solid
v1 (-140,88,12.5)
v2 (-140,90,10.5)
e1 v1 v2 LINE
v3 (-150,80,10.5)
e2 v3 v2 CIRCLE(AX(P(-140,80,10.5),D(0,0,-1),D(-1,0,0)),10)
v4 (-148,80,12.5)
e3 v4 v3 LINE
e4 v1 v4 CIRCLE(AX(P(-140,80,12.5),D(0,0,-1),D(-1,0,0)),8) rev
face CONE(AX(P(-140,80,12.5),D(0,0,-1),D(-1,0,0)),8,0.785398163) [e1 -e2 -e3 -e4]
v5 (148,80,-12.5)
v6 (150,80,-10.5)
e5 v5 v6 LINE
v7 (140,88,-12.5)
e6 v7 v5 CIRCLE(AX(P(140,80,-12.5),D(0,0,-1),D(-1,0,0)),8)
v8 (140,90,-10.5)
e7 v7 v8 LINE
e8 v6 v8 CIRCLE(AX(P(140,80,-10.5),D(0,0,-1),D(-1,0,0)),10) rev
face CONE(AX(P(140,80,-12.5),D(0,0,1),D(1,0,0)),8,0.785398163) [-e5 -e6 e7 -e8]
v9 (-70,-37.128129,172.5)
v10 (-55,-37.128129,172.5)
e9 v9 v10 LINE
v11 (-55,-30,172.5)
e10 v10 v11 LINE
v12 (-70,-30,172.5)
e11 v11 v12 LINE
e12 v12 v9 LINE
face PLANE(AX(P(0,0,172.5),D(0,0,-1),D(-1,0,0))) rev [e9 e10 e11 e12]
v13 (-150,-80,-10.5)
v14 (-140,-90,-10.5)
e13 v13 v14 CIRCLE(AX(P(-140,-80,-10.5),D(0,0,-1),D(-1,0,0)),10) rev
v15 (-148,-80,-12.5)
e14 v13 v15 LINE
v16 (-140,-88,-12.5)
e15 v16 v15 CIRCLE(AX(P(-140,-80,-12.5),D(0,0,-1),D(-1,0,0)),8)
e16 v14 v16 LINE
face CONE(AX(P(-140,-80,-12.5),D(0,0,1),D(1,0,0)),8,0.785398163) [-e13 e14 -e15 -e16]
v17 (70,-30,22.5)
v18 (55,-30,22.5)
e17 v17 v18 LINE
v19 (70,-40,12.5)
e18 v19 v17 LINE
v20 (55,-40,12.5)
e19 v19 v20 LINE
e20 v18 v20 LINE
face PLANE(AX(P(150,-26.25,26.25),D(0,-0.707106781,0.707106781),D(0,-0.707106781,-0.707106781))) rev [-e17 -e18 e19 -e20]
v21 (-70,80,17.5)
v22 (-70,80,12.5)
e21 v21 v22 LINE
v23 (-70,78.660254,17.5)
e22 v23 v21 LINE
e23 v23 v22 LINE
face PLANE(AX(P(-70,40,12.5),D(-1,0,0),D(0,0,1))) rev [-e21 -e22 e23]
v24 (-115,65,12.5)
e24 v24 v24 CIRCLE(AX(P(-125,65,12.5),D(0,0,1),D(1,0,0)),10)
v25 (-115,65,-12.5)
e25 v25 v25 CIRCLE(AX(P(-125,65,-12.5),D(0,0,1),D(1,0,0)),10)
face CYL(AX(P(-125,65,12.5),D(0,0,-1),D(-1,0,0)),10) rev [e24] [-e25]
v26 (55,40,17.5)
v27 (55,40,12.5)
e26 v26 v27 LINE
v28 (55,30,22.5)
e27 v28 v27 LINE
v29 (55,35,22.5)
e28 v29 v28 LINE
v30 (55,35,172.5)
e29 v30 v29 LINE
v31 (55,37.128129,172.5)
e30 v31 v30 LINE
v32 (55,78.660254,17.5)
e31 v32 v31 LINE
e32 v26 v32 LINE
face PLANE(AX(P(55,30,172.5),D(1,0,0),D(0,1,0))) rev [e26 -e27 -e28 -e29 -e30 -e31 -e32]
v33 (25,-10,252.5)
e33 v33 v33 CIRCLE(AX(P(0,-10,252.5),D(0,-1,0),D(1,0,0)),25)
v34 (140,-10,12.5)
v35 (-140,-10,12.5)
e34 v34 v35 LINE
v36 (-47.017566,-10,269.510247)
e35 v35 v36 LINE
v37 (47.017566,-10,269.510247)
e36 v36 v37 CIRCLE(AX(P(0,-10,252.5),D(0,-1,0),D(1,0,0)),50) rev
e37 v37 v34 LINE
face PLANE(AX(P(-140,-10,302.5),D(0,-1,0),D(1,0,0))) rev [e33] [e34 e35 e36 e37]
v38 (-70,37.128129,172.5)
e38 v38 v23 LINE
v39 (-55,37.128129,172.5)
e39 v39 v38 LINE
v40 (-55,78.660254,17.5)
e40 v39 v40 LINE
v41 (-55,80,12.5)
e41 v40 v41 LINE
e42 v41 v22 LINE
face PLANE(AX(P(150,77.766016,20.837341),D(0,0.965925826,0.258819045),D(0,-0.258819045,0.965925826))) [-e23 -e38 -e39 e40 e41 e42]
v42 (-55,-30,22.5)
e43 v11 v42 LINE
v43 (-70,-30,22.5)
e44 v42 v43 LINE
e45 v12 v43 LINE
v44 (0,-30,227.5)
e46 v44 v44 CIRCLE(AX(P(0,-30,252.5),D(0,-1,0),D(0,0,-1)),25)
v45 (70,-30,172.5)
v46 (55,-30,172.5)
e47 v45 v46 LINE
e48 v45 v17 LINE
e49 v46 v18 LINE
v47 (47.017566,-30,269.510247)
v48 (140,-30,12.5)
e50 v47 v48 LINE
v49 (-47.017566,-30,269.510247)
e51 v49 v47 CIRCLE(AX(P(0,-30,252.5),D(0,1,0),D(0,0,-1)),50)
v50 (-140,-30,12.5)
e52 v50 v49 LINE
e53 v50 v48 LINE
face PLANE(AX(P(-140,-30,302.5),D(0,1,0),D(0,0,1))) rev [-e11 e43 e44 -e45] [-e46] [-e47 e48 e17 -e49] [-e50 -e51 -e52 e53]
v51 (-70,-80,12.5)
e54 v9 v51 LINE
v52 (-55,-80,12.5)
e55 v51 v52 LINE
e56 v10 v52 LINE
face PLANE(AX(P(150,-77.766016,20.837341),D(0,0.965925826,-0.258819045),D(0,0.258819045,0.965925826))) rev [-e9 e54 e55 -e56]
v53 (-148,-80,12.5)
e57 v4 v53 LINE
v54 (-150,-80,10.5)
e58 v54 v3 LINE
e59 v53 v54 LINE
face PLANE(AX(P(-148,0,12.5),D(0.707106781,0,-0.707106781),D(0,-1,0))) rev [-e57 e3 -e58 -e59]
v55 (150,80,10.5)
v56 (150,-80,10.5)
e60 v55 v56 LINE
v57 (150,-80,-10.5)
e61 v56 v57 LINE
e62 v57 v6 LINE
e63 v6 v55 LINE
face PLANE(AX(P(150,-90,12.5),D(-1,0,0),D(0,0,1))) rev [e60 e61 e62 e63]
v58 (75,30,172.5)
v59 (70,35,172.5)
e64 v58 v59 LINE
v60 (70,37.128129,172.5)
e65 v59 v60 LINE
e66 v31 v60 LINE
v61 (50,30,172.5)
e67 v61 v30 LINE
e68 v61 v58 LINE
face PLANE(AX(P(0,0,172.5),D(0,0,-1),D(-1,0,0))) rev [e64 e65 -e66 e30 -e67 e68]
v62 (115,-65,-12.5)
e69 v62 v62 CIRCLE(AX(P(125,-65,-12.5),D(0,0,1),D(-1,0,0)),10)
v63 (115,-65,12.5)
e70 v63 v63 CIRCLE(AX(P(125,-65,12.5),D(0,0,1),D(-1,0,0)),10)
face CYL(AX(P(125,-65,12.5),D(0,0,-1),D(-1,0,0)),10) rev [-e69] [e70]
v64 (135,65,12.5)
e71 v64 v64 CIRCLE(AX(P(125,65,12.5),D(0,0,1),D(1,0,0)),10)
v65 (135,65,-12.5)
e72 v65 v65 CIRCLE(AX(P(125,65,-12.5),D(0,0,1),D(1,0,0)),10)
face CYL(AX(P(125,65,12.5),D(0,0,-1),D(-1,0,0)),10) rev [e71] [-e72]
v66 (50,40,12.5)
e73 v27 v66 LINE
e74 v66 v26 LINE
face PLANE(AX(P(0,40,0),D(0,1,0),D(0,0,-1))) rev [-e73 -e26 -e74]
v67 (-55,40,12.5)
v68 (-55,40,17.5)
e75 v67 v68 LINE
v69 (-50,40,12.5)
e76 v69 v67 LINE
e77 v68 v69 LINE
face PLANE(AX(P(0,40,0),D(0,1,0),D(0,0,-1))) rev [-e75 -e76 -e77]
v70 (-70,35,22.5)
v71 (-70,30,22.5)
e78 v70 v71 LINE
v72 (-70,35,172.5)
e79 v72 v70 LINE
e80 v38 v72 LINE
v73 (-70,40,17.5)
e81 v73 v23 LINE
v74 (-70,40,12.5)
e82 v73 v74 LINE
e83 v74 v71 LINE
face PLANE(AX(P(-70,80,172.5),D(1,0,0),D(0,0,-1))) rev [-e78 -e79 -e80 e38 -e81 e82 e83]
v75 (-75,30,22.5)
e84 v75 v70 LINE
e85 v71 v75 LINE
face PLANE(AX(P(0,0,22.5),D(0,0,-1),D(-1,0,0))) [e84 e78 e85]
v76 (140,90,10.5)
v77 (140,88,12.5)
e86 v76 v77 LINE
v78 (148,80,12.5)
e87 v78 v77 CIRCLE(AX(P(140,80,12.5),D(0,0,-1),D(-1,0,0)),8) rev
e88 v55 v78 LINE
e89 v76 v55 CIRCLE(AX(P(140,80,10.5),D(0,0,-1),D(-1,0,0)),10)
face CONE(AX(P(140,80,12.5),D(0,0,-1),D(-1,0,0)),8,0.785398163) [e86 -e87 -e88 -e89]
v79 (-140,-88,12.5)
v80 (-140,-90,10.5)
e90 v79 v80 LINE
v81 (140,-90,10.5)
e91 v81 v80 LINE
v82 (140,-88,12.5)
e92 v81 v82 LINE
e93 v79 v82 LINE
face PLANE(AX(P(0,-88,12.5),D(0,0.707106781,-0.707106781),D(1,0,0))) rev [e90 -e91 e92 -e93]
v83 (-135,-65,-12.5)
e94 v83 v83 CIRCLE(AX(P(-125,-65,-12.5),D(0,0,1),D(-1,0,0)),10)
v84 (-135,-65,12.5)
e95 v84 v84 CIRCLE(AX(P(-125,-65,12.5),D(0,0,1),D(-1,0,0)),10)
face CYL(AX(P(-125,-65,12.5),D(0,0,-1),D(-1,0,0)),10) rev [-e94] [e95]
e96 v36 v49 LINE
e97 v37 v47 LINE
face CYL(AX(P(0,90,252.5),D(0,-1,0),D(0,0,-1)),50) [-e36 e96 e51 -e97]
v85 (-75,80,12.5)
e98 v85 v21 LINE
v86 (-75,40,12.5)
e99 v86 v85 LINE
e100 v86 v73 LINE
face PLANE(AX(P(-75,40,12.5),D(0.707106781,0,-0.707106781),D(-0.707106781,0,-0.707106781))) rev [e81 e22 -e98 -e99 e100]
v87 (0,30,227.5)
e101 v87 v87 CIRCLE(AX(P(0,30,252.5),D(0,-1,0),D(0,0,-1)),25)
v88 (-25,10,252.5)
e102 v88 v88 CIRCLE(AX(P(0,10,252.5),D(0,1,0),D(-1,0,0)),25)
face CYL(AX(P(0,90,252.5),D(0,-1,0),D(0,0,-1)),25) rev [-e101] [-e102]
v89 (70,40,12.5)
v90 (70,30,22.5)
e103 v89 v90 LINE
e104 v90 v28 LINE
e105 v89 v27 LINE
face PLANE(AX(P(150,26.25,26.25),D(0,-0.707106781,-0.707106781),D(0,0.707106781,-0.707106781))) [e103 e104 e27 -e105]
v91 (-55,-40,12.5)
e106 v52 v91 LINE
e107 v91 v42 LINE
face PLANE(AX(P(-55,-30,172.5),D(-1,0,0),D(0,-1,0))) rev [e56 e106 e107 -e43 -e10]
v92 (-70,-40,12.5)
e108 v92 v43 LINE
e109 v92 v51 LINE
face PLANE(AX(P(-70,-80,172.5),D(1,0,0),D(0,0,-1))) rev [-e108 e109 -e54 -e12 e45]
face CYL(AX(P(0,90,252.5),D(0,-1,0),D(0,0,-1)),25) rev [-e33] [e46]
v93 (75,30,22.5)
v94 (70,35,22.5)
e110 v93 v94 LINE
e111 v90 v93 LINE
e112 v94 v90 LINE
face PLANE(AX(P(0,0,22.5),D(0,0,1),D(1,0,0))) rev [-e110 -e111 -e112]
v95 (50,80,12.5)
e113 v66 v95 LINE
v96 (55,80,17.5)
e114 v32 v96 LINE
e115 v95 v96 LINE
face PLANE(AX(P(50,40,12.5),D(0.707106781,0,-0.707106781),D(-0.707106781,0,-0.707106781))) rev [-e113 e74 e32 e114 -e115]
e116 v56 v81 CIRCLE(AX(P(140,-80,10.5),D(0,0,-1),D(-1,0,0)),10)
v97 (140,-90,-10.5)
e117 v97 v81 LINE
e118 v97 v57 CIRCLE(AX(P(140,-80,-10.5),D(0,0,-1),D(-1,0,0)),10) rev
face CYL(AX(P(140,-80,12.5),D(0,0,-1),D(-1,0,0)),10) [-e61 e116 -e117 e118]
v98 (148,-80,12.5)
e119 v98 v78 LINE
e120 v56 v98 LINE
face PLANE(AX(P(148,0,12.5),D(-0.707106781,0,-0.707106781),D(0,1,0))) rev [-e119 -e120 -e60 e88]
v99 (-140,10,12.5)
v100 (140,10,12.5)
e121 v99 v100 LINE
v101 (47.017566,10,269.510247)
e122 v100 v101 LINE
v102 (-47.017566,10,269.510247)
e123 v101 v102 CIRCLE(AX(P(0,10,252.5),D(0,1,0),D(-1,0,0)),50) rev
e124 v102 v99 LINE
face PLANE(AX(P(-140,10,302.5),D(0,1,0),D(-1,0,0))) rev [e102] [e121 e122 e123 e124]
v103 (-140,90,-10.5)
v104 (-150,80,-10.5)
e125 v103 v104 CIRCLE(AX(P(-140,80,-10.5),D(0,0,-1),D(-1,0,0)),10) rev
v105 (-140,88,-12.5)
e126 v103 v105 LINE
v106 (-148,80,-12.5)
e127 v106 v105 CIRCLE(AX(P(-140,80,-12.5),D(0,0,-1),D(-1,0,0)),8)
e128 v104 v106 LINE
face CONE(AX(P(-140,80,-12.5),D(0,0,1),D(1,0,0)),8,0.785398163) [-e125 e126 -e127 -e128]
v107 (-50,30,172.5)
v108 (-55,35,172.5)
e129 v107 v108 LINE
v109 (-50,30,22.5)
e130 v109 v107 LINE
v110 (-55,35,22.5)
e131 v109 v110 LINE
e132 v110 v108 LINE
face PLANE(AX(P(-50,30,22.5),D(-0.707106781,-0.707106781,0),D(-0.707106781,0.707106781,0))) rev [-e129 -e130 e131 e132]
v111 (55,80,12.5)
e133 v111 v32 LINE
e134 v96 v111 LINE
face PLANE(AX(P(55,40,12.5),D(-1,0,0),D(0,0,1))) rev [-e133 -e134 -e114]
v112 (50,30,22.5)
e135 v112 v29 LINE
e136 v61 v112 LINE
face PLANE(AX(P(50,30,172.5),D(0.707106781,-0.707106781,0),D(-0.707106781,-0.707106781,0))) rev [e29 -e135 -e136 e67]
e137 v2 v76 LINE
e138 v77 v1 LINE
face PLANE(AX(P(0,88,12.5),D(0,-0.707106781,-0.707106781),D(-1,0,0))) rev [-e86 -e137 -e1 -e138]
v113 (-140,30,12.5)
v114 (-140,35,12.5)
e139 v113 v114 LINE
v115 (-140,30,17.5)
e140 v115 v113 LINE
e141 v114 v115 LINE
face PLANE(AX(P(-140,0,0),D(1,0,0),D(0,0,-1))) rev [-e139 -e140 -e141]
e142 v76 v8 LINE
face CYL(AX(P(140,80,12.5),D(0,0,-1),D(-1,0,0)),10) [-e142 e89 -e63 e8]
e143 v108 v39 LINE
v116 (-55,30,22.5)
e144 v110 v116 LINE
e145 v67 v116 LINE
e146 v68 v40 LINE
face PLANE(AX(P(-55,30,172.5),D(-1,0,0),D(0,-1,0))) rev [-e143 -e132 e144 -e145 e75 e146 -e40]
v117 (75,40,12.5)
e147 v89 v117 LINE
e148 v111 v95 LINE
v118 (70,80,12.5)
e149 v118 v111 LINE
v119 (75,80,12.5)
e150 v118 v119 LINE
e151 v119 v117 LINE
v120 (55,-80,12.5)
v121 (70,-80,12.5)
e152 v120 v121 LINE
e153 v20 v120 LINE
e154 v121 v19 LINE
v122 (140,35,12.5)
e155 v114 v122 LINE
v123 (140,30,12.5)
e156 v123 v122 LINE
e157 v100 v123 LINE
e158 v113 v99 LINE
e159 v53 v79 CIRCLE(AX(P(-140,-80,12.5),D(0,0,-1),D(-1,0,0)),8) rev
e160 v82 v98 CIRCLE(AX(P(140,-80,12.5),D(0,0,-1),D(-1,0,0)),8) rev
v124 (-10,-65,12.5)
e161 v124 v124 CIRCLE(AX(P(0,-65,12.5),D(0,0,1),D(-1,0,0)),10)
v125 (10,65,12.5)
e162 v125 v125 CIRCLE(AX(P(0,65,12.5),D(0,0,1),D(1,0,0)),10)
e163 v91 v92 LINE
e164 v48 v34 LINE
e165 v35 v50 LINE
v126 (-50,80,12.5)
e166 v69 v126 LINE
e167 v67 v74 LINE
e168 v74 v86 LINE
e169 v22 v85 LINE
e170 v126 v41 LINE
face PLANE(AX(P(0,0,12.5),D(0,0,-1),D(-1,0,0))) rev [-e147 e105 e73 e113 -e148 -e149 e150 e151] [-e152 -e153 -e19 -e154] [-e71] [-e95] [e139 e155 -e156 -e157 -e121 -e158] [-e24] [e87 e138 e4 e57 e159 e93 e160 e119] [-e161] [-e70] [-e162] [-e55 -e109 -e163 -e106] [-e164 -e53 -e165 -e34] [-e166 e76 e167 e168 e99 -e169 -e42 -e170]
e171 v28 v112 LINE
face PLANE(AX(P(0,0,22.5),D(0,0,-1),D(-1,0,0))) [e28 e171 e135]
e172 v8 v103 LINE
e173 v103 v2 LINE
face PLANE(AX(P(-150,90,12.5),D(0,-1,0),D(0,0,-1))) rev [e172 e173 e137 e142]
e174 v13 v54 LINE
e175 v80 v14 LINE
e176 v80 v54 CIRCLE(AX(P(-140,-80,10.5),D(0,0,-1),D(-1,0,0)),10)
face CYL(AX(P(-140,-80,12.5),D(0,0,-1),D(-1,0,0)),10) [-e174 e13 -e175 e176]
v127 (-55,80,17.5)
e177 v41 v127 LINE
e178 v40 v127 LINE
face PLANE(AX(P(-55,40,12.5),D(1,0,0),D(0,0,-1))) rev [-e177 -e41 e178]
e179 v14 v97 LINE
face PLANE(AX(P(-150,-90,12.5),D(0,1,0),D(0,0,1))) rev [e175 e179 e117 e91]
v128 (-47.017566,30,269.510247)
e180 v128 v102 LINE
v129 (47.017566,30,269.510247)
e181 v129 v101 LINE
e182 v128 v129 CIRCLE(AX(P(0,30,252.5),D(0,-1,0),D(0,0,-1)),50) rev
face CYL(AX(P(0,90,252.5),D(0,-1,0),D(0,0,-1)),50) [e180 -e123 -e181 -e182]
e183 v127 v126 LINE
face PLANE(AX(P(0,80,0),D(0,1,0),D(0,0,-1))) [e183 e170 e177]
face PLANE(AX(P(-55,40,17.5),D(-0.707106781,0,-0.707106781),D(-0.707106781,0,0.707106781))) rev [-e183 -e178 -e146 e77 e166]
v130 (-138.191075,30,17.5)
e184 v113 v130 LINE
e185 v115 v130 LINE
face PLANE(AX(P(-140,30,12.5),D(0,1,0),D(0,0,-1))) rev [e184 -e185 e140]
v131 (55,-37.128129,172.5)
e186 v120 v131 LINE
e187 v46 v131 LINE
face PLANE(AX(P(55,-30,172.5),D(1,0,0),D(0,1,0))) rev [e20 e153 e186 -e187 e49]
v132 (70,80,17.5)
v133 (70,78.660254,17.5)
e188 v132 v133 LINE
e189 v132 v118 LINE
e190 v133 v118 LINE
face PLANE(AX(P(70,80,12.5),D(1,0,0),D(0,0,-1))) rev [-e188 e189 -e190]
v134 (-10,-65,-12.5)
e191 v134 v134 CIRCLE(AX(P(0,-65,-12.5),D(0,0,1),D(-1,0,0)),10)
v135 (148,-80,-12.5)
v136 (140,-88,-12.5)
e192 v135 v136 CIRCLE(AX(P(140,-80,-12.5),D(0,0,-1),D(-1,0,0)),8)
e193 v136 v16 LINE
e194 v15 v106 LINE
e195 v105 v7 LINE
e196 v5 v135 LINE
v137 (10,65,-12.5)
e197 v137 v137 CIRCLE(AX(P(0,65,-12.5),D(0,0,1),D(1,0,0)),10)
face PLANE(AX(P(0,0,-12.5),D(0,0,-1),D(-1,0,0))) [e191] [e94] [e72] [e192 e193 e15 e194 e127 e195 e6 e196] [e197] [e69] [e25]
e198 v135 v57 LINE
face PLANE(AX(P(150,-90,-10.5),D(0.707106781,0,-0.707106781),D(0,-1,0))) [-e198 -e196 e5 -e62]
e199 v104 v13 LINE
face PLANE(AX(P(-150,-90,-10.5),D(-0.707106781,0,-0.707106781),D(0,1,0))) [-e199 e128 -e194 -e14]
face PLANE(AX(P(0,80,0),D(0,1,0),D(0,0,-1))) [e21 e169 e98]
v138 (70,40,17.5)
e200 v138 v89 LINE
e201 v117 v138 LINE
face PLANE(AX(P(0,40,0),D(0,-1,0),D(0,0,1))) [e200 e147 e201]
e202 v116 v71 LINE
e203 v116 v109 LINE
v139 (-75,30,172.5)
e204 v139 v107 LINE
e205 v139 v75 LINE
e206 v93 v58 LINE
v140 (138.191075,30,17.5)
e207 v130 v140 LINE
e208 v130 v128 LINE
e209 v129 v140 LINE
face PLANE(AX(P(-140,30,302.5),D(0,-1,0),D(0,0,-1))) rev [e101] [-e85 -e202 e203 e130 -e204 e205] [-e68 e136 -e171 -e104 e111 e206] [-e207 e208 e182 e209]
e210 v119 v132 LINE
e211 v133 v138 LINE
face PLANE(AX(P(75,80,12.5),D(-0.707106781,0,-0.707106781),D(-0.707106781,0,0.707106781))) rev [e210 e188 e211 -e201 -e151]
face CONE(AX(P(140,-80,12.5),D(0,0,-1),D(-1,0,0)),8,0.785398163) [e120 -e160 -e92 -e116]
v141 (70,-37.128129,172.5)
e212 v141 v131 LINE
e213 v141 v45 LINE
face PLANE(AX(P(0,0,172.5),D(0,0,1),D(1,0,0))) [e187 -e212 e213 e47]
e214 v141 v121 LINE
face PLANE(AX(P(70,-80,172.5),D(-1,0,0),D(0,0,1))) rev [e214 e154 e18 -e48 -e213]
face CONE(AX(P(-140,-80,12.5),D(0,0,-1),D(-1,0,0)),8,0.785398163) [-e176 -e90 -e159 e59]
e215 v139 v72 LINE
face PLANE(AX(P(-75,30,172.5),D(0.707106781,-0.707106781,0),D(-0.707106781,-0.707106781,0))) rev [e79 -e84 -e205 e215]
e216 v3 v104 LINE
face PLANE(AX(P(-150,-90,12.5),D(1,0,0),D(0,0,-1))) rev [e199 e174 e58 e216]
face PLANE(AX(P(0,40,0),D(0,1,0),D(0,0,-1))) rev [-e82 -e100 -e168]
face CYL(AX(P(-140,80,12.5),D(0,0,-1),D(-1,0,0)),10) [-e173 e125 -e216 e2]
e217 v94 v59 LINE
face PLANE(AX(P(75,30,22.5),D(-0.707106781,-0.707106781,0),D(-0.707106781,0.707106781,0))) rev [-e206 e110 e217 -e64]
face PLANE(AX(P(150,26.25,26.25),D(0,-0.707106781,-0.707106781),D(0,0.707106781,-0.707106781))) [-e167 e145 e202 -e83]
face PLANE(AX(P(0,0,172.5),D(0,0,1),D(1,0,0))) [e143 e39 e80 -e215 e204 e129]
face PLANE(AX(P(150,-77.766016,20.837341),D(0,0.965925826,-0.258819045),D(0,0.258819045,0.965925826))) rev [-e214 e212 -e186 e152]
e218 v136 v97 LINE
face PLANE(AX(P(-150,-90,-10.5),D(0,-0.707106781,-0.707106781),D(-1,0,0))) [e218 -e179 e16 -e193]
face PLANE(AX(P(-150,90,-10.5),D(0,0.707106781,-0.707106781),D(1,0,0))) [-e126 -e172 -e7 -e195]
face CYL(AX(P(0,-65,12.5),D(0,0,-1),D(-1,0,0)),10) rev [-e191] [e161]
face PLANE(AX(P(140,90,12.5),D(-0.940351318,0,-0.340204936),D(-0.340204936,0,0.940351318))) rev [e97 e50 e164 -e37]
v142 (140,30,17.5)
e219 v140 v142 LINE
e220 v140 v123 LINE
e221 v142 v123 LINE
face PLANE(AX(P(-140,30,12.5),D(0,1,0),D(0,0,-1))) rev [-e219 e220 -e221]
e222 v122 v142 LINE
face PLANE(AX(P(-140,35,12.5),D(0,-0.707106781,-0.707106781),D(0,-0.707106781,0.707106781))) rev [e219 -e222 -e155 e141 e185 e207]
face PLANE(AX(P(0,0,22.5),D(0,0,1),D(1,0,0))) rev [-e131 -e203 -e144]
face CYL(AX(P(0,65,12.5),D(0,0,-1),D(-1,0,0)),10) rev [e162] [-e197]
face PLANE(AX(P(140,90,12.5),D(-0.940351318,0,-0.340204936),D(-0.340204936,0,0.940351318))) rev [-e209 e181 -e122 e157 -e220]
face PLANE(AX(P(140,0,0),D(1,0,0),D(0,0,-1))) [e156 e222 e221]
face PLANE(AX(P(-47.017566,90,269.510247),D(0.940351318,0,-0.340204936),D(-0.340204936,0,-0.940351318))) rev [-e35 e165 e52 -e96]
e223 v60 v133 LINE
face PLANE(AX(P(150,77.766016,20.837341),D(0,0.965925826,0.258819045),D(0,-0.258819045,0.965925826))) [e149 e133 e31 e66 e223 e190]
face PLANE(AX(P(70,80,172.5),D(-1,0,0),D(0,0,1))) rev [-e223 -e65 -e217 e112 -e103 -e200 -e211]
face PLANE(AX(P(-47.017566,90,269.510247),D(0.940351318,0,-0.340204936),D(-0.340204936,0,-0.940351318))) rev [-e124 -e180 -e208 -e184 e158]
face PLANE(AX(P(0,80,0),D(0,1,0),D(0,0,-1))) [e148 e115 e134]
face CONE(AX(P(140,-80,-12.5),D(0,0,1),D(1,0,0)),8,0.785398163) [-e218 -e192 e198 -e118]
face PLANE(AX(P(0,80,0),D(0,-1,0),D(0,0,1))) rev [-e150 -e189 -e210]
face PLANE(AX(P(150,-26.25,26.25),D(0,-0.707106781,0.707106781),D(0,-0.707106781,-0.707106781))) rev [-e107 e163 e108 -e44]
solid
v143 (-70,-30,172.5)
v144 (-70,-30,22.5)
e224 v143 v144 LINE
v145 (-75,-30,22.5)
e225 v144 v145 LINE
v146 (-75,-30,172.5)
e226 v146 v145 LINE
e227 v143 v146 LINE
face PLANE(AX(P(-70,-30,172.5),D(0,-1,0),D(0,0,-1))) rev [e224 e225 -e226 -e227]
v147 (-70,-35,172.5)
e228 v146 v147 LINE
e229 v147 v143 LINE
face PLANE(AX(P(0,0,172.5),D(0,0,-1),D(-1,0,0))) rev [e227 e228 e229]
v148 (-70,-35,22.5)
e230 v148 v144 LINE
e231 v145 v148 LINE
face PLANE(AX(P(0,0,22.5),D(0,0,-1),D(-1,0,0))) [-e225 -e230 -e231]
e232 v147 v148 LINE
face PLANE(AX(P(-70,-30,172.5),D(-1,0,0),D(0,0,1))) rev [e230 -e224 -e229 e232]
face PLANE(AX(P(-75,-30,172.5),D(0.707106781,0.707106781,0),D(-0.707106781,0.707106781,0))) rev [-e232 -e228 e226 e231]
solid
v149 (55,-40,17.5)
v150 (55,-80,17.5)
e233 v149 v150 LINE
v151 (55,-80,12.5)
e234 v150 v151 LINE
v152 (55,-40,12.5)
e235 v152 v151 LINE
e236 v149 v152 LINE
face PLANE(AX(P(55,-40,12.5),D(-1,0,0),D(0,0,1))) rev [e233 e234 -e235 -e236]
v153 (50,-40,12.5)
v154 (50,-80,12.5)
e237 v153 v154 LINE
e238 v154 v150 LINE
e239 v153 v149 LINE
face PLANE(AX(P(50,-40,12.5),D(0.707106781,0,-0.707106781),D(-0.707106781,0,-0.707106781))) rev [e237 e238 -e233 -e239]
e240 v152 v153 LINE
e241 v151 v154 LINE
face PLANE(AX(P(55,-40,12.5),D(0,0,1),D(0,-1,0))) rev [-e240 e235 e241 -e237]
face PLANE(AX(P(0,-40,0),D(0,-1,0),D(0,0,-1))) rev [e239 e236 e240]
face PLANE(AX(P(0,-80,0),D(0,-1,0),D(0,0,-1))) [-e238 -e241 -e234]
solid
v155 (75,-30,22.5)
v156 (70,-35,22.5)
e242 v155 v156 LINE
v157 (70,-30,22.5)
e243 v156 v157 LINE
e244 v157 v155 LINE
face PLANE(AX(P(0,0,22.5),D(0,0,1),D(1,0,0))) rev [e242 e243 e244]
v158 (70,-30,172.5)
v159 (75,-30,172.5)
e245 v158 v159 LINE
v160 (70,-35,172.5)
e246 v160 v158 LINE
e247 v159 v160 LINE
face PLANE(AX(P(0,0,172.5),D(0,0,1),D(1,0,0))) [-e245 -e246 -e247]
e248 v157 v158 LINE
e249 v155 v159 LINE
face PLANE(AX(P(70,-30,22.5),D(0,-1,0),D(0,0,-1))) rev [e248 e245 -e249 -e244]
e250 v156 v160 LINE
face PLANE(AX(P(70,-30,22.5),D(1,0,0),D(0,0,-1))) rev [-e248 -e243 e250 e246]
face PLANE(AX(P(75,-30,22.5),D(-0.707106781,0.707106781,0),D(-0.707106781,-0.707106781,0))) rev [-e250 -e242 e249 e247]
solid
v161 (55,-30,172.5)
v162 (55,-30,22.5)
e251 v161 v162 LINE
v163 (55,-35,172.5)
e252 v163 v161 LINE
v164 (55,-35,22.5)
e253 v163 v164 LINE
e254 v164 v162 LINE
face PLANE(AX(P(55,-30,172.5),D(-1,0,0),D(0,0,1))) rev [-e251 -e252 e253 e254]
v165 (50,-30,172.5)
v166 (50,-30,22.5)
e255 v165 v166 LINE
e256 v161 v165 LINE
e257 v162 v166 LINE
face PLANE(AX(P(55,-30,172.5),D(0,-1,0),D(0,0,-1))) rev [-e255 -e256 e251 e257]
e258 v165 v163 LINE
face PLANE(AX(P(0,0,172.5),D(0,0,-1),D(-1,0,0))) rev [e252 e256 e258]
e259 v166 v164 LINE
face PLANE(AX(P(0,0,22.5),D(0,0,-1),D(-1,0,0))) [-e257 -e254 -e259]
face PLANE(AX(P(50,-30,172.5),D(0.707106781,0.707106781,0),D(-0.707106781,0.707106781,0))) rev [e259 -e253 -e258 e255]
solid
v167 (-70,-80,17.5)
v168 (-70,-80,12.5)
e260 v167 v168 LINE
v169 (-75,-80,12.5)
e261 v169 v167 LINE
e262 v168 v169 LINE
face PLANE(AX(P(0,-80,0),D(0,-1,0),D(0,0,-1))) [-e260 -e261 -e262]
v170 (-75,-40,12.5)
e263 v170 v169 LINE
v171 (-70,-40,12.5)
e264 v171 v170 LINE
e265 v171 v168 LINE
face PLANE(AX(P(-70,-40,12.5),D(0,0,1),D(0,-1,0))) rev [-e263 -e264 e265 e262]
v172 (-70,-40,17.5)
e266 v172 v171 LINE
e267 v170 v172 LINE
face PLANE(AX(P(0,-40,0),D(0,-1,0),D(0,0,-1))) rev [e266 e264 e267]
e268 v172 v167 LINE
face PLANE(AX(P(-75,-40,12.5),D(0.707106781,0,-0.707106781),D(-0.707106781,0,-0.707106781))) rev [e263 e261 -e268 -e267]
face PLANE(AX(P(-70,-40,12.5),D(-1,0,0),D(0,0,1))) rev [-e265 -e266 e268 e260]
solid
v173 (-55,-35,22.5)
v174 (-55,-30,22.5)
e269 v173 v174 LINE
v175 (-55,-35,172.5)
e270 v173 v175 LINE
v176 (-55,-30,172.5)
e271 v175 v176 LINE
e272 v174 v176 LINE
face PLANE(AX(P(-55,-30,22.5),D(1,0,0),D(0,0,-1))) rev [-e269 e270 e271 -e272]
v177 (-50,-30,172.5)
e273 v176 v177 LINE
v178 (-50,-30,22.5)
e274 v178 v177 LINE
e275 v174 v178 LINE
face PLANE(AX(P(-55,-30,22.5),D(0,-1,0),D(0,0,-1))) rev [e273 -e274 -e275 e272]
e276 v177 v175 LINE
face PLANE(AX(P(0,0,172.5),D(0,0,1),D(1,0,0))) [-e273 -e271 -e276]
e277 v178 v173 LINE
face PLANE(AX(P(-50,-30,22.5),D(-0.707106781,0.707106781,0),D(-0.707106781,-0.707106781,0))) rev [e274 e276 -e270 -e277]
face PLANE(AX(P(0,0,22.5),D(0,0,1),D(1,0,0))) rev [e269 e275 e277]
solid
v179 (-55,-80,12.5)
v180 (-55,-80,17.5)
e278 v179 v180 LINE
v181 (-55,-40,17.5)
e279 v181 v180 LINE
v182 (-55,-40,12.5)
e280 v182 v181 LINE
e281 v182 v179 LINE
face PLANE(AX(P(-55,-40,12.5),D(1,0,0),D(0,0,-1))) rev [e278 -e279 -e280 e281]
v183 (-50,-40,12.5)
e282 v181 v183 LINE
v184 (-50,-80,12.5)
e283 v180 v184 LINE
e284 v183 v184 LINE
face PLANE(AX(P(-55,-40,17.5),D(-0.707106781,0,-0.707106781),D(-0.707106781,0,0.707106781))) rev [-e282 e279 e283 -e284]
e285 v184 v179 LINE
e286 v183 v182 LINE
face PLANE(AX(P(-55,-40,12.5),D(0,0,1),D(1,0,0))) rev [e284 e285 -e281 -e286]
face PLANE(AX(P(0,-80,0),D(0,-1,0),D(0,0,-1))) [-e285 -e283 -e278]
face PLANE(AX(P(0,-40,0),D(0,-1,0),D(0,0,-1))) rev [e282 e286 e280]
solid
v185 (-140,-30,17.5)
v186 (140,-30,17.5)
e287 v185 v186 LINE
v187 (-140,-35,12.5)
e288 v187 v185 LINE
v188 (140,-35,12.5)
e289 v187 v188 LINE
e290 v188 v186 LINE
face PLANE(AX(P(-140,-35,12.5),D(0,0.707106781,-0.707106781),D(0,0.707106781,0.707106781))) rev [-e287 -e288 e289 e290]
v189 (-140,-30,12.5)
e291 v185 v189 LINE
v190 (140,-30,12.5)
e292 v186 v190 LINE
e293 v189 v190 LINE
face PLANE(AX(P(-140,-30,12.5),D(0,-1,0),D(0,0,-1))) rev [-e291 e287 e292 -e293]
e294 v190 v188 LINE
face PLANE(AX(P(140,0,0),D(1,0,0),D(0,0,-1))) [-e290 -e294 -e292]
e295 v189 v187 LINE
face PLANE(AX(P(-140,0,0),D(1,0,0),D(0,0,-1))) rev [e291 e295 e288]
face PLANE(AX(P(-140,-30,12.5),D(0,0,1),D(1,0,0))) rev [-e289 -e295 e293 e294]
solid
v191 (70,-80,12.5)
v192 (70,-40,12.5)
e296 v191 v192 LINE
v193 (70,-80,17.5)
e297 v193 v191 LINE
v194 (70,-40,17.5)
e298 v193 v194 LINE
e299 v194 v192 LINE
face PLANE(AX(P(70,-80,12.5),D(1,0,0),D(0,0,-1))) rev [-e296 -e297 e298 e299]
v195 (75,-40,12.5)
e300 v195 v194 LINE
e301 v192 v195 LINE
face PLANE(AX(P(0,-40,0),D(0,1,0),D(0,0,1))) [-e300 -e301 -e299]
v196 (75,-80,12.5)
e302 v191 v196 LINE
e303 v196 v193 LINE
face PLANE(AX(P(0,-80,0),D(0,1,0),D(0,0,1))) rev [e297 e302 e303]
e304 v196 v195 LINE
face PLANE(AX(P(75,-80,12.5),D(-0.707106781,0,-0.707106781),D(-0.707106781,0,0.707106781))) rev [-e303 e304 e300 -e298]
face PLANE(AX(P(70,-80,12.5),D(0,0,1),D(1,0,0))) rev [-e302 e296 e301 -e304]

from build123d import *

# Parameters (mm, degrees)
SKETCH1_W           = 300
SKETCH1_H           = 180
SKETCH1_R           = 10
BOSS_EXTRUDE1_DEPTH = 12.5
FILLET1_R           = 10
CHAMFER1_SIZE       = 2
SKETCH6_W           = 280
SKETCH6_H           = 20
BOSS_EXTRUDE3_DEPTH = 290
SKETCH7_R           = 25
CUT_EXTRUDE2_DEPTH  = 359.338178262
SKETCH8_W           = 15
SKETCH8_H           = 50
BOSS_EXTRUDE4_DEPTH = 160
CUT_EXTRUDE3_DEPTH  = 385.715804198
GUSSET1_THICKNESS   = 280
GUSSET2_THICKNESS   = 150
GUSSET3_THICKNESS   = 150
GUSSET4_THICKNESS   = 150
GUSSET5_THICKNESS   = 150
GUSSET6_THICKNESS   = 40
GUSSET7_THICKNESS   = 40
GUSSET8_THICKNESS   = 40
GUSSET9_THICKNESS   = 40
MIRROR1_START       = 22.5
MIRROR1_DEPTH       = 150
MIRROR1_START_2     = -140
MIRROR1_2_DEPTH     = 280
MIRROR1_3_DEPTH     = 150
MIRROR1_START_3     = 40
MIRROR1_4_DEPTH     = 40


with BuildPart() as part:
    # Sketch1 → Boss-Extrude1 (new, symmetric)
    with BuildSketch(Plane.XY):
        Rectangle(SKETCH1_W, SKETCH1_H)
        with Locations((-125, 65)):
            Circle(SKETCH1_R, mode=Mode.SUBTRACT)
        with Locations((0, 65)):
            Circle(SKETCH1_R, mode=Mode.SUBTRACT)
        with Locations((125, 65)):
            Circle(SKETCH1_R, mode=Mode.SUBTRACT)
        with Locations(Location((125, -65, 0), (0, 0, 180))):
            Circle(SKETCH1_R, mode=Mode.SUBTRACT)
        with Locations(Location((0, -65, 0), (0, 0, 180))):
            Circle(SKETCH1_R, mode=Mode.SUBTRACT)
        with Locations(Location((-125, -65, 0), (0, 0, 180))):
            Circle(SKETCH1_R, mode=Mode.SUBTRACT)
    extrude(amount=BOSS_EXTRUDE1_DEPTH, both=True)

    # Fillet1
    fillet1_edges = [part.edges().sort_by_distance(p)[0] for p in [
        (150, -90, 0),
        (-150, -90, 0),
        (-150, 90, 0),
        (150, 90, 0),
    ]]
    fillet(fillet1_edges, radius=FILLET1_R)

    # Chamfer1
    chamfer1_edges = [part.edges().sort_by_distance(p)[0] for p in [
        (0, 90, -12.5),
        (0, 90, 12.5),
        (150, 0, -12.5),
        (0, -90, -12.5),
        (-150, 0, -12.5),
        (-147.071067812, 87.071067812, -12.5),
        (-147.071067812, -87.071067812, -12.5),
        (147.071067812, -87.071067812, -12.5),
        (147.071067812, 87.071067812, -12.5),
        (150, 0, 12.5),
        (-150, 0, 12.5),
        (0, -90, 12.5),
        (-147.071067812, 87.071067812, 12.5),
        (-147.071067812, -87.071067812, 12.5),
        (147.071067812, -87.071067812, 12.5),
        (147.071067812, 87.071067812, 12.5),
    ]]
    chamfer(chamfer1_edges, length=CHAMFER1_SIZE)

    # Sketch6 → Boss-Extrude3 (add)
    with BuildSketch(Plane.XY.offset(12.5)):
        with Locations((0, -20)):
            Rectangle(SKETCH6_W, SKETCH6_H)
        with Locations((0, 20)):
            Rectangle(SKETCH6_W, SKETCH6_H)
    extrude(amount=BOSS_EXTRUDE3_DEPTH)

    # Sketch7 → Cut-Extrude2 (cut, through all)
    with BuildSketch(Plane.XZ.offset(30)):
        with Locations(Location((0, 252.5, 0), (0, 0, 270))):
            Circle(SKETCH7_R)
        with BuildLine():
            Line((-47.017565913, 269.510246783), (-140, 12.5))
            Line((-140, 12.5), (-140, 338.026401393))
            Line((-140, 338.026401393), (140, 338.026401393))
            Line((140, 338.026401393), (140, 12.5))
            Line((140, 12.5), (47.017565913, 269.510246783))
            ThreePointArc((47.017565913, 269.510246783), (0, 302.5), (-47.017565913, 269.510246783))
        make_face()
    extrude(amount=-CUT_EXTRUDE2_DEPTH, mode=Mode.SUBTRACT)

    # Sketch8 → Boss-Extrude4 (add)
    with BuildSketch(Plane.XY.offset(12.5)):
        with Locations((62.5, -55)):
            Rectangle(SKETCH8_W, SKETCH8_H)
        with Locations((-62.5, -55)):
            Rectangle(SKETCH8_W, SKETCH8_H)
        with Locations((62.5, 55)):
            Rectangle(SKETCH8_W, SKETCH8_H)
        with Locations((-62.5, 55)):
            Rectangle(SKETCH8_W, SKETCH8_H)
    extrude(amount=BOSS_EXTRUDE4_DEPTH)

    # Sketch9 → Cut-Extrude3 (cut, through all)
    with BuildSketch(Plane.ZY.offset(70)):
        Polygon((12.5, 80), (172.5, 37.128129211), (172.5, 80), align=None)
        Polygon((22.5, 30), (12.5, 40), (12.5, 30), align=None)
        Polygon((12.5, -40), (12.5, -30), (22.5, -30), align=None)
        Polygon((172.5, -37.128129211), (176.037028875, -86.220399065), (12.5, -80), align=None)
    extrude(amount=-CUT_EXTRUDE3_DEPTH, mode=Mode.SUBTRACT)

    # Mirror1: read off the stored shape, not the designer's step
    # Mirror1 outline → Mirror1 (add)
    with BuildSketch(Plane.XY.offset(MIRROR1_START)):
        Polygon((70, 35), (70, 30), (75, 30), align=None)
        Polygon((-75, 30), (-70, 30), (-70, 35), align=None)
        Polygon((-50, 30), (-55, 35), (-55, 30), align=None)
    extrude(amount=MIRROR1_DEPTH)

    # Mirror1 2 outline → Mirror1 2 (add)
    with BuildSketch(Plane.YZ.offset(MIRROR1_START_2)):
        Polygon((30, 17.5), (30, 12.5), (35, 12.5), align=None)
    extrude(amount=MIRROR1_2_DEPTH)

    # Mirror1 3 outline → Mirror1 3 (add)
    with BuildSketch(Plane.XY.offset(MIRROR1_START)):
        Polygon((55, 35), (50, 30), (55, 30), align=None)
    extrude(amount=MIRROR1_3_DEPTH)

    # Mirror1 4 outline → Mirror1 4 (add)
    with BuildSketch(Plane(origin=(0, 0, 0), x_dir=(1, 0, 0), z_dir=(0, 1, 0)).offset(MIRROR1_START_3)):
        Polygon((-70, -17.5), (-70, -12.5), (-75, -12.5), align=None)
        Polygon((75, -12.5), (70, -12.5), (70, -17.5), align=None)
        Polygon((55, -12.5), (50, -12.5), (55, -17.5), align=None)
        Polygon((-55, -17.5), (-50, -12.5), (-55, -12.5), align=None)
    extrude(amount=MIRROR1_4_DEPTH)


with BuildPart() as body_2:
    # Gusset1: a gusset: a plate 280.0 thick in the corner of two members, its outline drawn in place
    gusset1_outline = Wire([Line((-140, -30, 12.5), (-140, -35, 12.5)), Line((-140, -35, 12.5), (-140, -30, 17.5)), Line((-140, -30, 17.5), (-140, -30, 12.5))])
    add(extrude(Face(gusset1_outline), amount=GUSSET1_THICKNESS, dir=(1, 0, 0)))


with BuildPart() as body_3:
    # Gusset2: a gusset: a plate 150.0 thick in the corner of two members, its outline drawn in place
    gusset2_outline = Wire([Line((-55, -30, 22.5), (-50, -30, 22.5)), Line((-50, -30, 22.5), (-55, -35, 22.5)), Line((-55, -35, 22.5), (-55, -30, 22.5))])
    add(extrude(Face(gusset2_outline), amount=GUSSET2_THICKNESS, dir=(0, 0, 1)))


with BuildPart() as body_4:
    # Gusset3: a gusset: a plate 150.0 thick in the corner of two members, its outline drawn in place
    gusset3_outline = Wire([Line((55, -30, 172.5), (50, -30, 172.5)), Line((50, -30, 172.5), (55, -35, 172.5)), Line((55, -35, 172.5), (55, -30, 172.5))])
    add(extrude(Face(gusset3_outline), amount=GUSSET3_THICKNESS, dir=(0, 0, -1)))


with BuildPart() as body_5:
    # Gusset4: a gusset: a plate 150.0 thick in the corner of two members, its outline drawn in place
    gusset4_outline = Wire([Line((70, -30, 22.5), (75, -30, 22.5)), Line((75, -30, 22.5), (70, -35, 22.5)), Line((70, -35, 22.5), (70, -30, 22.5))])
    add(extrude(Face(gusset4_outline), amount=GUSSET4_THICKNESS, dir=(0, 0, 1)))


with BuildPart() as body_6:
    # Gusset5: a gusset: a plate 150.0 thick in the corner of two members, its outline drawn in place
    gusset5_outline = Wire([Line((-70, -30, 172.5), (-75, -30, 172.5)), Line((-75, -30, 172.5), (-70, -35, 172.5)), Line((-70, -35, 172.5), (-70, -30, 172.5))])
    add(extrude(Face(gusset5_outline), amount=GUSSET5_THICKNESS, dir=(0, 0, -1)))


with BuildPart() as body_7:
    # Gusset6: a gusset: a plate 40.0 thick in the corner of two members, its outline drawn in place
    gusset6_outline = Wire([Line((-55, -40, 12.5), (-55, -40, 17.5)), Line((-55, -40, 17.5), (-50, -40, 12.5)), Line((-50, -40, 12.5), (-55, -40, 12.5))])
    add(extrude(Face(gusset6_outline), amount=GUSSET6_THICKNESS, dir=(0, -1, 0)))


with BuildPart() as body_8:
    # Gusset7: a gusset: a plate 40.0 thick in the corner of two members, its outline drawn in place
    gusset7_outline = Wire([Line((-70, -40, 12.5), (-75, -40, 12.5)), Line((-75, -40, 12.5), (-70, -40, 17.5)), Line((-70, -40, 17.5), (-70, -40, 12.5))])
    add(extrude(Face(gusset7_outline), amount=GUSSET7_THICKNESS, dir=(0, -1, 0)))


with BuildPart() as body_9:
    # Gusset8: a gusset: a plate 40.0 thick in the corner of two members, its outline drawn in place
    gusset8_outline = Wire([Line((70, -80, 12.5), (75, -80, 12.5)), Line((75, -80, 12.5), (70, -80, 17.5)), Line((70, -80, 17.5), (70, -80, 12.5))])
    add(extrude(Face(gusset8_outline), amount=GUSSET8_THICKNESS, dir=(0, 1, 0)))


with BuildPart() as body_10:
    # Gusset9: a gusset: a plate 40.0 thick in the corner of two members, its outline drawn in place
    gusset9_outline = Wire([Line((55, -40, 12.5), (50, -40, 12.5)), Line((50, -40, 12.5), (55, -40, 17.5)), Line((55, -40, 17.5), (55, -40, 12.5))])
    add(extrude(Face(gusset9_outline), amount=GUSSET9_THICKNESS, dir=(0, -1, 0)))


solid = Compound([part.part, body_2.part, body_3.part, body_4.part, body_5.part, body_6.part, body_7.part, body_8.part, body_9.part, body_10.part])
